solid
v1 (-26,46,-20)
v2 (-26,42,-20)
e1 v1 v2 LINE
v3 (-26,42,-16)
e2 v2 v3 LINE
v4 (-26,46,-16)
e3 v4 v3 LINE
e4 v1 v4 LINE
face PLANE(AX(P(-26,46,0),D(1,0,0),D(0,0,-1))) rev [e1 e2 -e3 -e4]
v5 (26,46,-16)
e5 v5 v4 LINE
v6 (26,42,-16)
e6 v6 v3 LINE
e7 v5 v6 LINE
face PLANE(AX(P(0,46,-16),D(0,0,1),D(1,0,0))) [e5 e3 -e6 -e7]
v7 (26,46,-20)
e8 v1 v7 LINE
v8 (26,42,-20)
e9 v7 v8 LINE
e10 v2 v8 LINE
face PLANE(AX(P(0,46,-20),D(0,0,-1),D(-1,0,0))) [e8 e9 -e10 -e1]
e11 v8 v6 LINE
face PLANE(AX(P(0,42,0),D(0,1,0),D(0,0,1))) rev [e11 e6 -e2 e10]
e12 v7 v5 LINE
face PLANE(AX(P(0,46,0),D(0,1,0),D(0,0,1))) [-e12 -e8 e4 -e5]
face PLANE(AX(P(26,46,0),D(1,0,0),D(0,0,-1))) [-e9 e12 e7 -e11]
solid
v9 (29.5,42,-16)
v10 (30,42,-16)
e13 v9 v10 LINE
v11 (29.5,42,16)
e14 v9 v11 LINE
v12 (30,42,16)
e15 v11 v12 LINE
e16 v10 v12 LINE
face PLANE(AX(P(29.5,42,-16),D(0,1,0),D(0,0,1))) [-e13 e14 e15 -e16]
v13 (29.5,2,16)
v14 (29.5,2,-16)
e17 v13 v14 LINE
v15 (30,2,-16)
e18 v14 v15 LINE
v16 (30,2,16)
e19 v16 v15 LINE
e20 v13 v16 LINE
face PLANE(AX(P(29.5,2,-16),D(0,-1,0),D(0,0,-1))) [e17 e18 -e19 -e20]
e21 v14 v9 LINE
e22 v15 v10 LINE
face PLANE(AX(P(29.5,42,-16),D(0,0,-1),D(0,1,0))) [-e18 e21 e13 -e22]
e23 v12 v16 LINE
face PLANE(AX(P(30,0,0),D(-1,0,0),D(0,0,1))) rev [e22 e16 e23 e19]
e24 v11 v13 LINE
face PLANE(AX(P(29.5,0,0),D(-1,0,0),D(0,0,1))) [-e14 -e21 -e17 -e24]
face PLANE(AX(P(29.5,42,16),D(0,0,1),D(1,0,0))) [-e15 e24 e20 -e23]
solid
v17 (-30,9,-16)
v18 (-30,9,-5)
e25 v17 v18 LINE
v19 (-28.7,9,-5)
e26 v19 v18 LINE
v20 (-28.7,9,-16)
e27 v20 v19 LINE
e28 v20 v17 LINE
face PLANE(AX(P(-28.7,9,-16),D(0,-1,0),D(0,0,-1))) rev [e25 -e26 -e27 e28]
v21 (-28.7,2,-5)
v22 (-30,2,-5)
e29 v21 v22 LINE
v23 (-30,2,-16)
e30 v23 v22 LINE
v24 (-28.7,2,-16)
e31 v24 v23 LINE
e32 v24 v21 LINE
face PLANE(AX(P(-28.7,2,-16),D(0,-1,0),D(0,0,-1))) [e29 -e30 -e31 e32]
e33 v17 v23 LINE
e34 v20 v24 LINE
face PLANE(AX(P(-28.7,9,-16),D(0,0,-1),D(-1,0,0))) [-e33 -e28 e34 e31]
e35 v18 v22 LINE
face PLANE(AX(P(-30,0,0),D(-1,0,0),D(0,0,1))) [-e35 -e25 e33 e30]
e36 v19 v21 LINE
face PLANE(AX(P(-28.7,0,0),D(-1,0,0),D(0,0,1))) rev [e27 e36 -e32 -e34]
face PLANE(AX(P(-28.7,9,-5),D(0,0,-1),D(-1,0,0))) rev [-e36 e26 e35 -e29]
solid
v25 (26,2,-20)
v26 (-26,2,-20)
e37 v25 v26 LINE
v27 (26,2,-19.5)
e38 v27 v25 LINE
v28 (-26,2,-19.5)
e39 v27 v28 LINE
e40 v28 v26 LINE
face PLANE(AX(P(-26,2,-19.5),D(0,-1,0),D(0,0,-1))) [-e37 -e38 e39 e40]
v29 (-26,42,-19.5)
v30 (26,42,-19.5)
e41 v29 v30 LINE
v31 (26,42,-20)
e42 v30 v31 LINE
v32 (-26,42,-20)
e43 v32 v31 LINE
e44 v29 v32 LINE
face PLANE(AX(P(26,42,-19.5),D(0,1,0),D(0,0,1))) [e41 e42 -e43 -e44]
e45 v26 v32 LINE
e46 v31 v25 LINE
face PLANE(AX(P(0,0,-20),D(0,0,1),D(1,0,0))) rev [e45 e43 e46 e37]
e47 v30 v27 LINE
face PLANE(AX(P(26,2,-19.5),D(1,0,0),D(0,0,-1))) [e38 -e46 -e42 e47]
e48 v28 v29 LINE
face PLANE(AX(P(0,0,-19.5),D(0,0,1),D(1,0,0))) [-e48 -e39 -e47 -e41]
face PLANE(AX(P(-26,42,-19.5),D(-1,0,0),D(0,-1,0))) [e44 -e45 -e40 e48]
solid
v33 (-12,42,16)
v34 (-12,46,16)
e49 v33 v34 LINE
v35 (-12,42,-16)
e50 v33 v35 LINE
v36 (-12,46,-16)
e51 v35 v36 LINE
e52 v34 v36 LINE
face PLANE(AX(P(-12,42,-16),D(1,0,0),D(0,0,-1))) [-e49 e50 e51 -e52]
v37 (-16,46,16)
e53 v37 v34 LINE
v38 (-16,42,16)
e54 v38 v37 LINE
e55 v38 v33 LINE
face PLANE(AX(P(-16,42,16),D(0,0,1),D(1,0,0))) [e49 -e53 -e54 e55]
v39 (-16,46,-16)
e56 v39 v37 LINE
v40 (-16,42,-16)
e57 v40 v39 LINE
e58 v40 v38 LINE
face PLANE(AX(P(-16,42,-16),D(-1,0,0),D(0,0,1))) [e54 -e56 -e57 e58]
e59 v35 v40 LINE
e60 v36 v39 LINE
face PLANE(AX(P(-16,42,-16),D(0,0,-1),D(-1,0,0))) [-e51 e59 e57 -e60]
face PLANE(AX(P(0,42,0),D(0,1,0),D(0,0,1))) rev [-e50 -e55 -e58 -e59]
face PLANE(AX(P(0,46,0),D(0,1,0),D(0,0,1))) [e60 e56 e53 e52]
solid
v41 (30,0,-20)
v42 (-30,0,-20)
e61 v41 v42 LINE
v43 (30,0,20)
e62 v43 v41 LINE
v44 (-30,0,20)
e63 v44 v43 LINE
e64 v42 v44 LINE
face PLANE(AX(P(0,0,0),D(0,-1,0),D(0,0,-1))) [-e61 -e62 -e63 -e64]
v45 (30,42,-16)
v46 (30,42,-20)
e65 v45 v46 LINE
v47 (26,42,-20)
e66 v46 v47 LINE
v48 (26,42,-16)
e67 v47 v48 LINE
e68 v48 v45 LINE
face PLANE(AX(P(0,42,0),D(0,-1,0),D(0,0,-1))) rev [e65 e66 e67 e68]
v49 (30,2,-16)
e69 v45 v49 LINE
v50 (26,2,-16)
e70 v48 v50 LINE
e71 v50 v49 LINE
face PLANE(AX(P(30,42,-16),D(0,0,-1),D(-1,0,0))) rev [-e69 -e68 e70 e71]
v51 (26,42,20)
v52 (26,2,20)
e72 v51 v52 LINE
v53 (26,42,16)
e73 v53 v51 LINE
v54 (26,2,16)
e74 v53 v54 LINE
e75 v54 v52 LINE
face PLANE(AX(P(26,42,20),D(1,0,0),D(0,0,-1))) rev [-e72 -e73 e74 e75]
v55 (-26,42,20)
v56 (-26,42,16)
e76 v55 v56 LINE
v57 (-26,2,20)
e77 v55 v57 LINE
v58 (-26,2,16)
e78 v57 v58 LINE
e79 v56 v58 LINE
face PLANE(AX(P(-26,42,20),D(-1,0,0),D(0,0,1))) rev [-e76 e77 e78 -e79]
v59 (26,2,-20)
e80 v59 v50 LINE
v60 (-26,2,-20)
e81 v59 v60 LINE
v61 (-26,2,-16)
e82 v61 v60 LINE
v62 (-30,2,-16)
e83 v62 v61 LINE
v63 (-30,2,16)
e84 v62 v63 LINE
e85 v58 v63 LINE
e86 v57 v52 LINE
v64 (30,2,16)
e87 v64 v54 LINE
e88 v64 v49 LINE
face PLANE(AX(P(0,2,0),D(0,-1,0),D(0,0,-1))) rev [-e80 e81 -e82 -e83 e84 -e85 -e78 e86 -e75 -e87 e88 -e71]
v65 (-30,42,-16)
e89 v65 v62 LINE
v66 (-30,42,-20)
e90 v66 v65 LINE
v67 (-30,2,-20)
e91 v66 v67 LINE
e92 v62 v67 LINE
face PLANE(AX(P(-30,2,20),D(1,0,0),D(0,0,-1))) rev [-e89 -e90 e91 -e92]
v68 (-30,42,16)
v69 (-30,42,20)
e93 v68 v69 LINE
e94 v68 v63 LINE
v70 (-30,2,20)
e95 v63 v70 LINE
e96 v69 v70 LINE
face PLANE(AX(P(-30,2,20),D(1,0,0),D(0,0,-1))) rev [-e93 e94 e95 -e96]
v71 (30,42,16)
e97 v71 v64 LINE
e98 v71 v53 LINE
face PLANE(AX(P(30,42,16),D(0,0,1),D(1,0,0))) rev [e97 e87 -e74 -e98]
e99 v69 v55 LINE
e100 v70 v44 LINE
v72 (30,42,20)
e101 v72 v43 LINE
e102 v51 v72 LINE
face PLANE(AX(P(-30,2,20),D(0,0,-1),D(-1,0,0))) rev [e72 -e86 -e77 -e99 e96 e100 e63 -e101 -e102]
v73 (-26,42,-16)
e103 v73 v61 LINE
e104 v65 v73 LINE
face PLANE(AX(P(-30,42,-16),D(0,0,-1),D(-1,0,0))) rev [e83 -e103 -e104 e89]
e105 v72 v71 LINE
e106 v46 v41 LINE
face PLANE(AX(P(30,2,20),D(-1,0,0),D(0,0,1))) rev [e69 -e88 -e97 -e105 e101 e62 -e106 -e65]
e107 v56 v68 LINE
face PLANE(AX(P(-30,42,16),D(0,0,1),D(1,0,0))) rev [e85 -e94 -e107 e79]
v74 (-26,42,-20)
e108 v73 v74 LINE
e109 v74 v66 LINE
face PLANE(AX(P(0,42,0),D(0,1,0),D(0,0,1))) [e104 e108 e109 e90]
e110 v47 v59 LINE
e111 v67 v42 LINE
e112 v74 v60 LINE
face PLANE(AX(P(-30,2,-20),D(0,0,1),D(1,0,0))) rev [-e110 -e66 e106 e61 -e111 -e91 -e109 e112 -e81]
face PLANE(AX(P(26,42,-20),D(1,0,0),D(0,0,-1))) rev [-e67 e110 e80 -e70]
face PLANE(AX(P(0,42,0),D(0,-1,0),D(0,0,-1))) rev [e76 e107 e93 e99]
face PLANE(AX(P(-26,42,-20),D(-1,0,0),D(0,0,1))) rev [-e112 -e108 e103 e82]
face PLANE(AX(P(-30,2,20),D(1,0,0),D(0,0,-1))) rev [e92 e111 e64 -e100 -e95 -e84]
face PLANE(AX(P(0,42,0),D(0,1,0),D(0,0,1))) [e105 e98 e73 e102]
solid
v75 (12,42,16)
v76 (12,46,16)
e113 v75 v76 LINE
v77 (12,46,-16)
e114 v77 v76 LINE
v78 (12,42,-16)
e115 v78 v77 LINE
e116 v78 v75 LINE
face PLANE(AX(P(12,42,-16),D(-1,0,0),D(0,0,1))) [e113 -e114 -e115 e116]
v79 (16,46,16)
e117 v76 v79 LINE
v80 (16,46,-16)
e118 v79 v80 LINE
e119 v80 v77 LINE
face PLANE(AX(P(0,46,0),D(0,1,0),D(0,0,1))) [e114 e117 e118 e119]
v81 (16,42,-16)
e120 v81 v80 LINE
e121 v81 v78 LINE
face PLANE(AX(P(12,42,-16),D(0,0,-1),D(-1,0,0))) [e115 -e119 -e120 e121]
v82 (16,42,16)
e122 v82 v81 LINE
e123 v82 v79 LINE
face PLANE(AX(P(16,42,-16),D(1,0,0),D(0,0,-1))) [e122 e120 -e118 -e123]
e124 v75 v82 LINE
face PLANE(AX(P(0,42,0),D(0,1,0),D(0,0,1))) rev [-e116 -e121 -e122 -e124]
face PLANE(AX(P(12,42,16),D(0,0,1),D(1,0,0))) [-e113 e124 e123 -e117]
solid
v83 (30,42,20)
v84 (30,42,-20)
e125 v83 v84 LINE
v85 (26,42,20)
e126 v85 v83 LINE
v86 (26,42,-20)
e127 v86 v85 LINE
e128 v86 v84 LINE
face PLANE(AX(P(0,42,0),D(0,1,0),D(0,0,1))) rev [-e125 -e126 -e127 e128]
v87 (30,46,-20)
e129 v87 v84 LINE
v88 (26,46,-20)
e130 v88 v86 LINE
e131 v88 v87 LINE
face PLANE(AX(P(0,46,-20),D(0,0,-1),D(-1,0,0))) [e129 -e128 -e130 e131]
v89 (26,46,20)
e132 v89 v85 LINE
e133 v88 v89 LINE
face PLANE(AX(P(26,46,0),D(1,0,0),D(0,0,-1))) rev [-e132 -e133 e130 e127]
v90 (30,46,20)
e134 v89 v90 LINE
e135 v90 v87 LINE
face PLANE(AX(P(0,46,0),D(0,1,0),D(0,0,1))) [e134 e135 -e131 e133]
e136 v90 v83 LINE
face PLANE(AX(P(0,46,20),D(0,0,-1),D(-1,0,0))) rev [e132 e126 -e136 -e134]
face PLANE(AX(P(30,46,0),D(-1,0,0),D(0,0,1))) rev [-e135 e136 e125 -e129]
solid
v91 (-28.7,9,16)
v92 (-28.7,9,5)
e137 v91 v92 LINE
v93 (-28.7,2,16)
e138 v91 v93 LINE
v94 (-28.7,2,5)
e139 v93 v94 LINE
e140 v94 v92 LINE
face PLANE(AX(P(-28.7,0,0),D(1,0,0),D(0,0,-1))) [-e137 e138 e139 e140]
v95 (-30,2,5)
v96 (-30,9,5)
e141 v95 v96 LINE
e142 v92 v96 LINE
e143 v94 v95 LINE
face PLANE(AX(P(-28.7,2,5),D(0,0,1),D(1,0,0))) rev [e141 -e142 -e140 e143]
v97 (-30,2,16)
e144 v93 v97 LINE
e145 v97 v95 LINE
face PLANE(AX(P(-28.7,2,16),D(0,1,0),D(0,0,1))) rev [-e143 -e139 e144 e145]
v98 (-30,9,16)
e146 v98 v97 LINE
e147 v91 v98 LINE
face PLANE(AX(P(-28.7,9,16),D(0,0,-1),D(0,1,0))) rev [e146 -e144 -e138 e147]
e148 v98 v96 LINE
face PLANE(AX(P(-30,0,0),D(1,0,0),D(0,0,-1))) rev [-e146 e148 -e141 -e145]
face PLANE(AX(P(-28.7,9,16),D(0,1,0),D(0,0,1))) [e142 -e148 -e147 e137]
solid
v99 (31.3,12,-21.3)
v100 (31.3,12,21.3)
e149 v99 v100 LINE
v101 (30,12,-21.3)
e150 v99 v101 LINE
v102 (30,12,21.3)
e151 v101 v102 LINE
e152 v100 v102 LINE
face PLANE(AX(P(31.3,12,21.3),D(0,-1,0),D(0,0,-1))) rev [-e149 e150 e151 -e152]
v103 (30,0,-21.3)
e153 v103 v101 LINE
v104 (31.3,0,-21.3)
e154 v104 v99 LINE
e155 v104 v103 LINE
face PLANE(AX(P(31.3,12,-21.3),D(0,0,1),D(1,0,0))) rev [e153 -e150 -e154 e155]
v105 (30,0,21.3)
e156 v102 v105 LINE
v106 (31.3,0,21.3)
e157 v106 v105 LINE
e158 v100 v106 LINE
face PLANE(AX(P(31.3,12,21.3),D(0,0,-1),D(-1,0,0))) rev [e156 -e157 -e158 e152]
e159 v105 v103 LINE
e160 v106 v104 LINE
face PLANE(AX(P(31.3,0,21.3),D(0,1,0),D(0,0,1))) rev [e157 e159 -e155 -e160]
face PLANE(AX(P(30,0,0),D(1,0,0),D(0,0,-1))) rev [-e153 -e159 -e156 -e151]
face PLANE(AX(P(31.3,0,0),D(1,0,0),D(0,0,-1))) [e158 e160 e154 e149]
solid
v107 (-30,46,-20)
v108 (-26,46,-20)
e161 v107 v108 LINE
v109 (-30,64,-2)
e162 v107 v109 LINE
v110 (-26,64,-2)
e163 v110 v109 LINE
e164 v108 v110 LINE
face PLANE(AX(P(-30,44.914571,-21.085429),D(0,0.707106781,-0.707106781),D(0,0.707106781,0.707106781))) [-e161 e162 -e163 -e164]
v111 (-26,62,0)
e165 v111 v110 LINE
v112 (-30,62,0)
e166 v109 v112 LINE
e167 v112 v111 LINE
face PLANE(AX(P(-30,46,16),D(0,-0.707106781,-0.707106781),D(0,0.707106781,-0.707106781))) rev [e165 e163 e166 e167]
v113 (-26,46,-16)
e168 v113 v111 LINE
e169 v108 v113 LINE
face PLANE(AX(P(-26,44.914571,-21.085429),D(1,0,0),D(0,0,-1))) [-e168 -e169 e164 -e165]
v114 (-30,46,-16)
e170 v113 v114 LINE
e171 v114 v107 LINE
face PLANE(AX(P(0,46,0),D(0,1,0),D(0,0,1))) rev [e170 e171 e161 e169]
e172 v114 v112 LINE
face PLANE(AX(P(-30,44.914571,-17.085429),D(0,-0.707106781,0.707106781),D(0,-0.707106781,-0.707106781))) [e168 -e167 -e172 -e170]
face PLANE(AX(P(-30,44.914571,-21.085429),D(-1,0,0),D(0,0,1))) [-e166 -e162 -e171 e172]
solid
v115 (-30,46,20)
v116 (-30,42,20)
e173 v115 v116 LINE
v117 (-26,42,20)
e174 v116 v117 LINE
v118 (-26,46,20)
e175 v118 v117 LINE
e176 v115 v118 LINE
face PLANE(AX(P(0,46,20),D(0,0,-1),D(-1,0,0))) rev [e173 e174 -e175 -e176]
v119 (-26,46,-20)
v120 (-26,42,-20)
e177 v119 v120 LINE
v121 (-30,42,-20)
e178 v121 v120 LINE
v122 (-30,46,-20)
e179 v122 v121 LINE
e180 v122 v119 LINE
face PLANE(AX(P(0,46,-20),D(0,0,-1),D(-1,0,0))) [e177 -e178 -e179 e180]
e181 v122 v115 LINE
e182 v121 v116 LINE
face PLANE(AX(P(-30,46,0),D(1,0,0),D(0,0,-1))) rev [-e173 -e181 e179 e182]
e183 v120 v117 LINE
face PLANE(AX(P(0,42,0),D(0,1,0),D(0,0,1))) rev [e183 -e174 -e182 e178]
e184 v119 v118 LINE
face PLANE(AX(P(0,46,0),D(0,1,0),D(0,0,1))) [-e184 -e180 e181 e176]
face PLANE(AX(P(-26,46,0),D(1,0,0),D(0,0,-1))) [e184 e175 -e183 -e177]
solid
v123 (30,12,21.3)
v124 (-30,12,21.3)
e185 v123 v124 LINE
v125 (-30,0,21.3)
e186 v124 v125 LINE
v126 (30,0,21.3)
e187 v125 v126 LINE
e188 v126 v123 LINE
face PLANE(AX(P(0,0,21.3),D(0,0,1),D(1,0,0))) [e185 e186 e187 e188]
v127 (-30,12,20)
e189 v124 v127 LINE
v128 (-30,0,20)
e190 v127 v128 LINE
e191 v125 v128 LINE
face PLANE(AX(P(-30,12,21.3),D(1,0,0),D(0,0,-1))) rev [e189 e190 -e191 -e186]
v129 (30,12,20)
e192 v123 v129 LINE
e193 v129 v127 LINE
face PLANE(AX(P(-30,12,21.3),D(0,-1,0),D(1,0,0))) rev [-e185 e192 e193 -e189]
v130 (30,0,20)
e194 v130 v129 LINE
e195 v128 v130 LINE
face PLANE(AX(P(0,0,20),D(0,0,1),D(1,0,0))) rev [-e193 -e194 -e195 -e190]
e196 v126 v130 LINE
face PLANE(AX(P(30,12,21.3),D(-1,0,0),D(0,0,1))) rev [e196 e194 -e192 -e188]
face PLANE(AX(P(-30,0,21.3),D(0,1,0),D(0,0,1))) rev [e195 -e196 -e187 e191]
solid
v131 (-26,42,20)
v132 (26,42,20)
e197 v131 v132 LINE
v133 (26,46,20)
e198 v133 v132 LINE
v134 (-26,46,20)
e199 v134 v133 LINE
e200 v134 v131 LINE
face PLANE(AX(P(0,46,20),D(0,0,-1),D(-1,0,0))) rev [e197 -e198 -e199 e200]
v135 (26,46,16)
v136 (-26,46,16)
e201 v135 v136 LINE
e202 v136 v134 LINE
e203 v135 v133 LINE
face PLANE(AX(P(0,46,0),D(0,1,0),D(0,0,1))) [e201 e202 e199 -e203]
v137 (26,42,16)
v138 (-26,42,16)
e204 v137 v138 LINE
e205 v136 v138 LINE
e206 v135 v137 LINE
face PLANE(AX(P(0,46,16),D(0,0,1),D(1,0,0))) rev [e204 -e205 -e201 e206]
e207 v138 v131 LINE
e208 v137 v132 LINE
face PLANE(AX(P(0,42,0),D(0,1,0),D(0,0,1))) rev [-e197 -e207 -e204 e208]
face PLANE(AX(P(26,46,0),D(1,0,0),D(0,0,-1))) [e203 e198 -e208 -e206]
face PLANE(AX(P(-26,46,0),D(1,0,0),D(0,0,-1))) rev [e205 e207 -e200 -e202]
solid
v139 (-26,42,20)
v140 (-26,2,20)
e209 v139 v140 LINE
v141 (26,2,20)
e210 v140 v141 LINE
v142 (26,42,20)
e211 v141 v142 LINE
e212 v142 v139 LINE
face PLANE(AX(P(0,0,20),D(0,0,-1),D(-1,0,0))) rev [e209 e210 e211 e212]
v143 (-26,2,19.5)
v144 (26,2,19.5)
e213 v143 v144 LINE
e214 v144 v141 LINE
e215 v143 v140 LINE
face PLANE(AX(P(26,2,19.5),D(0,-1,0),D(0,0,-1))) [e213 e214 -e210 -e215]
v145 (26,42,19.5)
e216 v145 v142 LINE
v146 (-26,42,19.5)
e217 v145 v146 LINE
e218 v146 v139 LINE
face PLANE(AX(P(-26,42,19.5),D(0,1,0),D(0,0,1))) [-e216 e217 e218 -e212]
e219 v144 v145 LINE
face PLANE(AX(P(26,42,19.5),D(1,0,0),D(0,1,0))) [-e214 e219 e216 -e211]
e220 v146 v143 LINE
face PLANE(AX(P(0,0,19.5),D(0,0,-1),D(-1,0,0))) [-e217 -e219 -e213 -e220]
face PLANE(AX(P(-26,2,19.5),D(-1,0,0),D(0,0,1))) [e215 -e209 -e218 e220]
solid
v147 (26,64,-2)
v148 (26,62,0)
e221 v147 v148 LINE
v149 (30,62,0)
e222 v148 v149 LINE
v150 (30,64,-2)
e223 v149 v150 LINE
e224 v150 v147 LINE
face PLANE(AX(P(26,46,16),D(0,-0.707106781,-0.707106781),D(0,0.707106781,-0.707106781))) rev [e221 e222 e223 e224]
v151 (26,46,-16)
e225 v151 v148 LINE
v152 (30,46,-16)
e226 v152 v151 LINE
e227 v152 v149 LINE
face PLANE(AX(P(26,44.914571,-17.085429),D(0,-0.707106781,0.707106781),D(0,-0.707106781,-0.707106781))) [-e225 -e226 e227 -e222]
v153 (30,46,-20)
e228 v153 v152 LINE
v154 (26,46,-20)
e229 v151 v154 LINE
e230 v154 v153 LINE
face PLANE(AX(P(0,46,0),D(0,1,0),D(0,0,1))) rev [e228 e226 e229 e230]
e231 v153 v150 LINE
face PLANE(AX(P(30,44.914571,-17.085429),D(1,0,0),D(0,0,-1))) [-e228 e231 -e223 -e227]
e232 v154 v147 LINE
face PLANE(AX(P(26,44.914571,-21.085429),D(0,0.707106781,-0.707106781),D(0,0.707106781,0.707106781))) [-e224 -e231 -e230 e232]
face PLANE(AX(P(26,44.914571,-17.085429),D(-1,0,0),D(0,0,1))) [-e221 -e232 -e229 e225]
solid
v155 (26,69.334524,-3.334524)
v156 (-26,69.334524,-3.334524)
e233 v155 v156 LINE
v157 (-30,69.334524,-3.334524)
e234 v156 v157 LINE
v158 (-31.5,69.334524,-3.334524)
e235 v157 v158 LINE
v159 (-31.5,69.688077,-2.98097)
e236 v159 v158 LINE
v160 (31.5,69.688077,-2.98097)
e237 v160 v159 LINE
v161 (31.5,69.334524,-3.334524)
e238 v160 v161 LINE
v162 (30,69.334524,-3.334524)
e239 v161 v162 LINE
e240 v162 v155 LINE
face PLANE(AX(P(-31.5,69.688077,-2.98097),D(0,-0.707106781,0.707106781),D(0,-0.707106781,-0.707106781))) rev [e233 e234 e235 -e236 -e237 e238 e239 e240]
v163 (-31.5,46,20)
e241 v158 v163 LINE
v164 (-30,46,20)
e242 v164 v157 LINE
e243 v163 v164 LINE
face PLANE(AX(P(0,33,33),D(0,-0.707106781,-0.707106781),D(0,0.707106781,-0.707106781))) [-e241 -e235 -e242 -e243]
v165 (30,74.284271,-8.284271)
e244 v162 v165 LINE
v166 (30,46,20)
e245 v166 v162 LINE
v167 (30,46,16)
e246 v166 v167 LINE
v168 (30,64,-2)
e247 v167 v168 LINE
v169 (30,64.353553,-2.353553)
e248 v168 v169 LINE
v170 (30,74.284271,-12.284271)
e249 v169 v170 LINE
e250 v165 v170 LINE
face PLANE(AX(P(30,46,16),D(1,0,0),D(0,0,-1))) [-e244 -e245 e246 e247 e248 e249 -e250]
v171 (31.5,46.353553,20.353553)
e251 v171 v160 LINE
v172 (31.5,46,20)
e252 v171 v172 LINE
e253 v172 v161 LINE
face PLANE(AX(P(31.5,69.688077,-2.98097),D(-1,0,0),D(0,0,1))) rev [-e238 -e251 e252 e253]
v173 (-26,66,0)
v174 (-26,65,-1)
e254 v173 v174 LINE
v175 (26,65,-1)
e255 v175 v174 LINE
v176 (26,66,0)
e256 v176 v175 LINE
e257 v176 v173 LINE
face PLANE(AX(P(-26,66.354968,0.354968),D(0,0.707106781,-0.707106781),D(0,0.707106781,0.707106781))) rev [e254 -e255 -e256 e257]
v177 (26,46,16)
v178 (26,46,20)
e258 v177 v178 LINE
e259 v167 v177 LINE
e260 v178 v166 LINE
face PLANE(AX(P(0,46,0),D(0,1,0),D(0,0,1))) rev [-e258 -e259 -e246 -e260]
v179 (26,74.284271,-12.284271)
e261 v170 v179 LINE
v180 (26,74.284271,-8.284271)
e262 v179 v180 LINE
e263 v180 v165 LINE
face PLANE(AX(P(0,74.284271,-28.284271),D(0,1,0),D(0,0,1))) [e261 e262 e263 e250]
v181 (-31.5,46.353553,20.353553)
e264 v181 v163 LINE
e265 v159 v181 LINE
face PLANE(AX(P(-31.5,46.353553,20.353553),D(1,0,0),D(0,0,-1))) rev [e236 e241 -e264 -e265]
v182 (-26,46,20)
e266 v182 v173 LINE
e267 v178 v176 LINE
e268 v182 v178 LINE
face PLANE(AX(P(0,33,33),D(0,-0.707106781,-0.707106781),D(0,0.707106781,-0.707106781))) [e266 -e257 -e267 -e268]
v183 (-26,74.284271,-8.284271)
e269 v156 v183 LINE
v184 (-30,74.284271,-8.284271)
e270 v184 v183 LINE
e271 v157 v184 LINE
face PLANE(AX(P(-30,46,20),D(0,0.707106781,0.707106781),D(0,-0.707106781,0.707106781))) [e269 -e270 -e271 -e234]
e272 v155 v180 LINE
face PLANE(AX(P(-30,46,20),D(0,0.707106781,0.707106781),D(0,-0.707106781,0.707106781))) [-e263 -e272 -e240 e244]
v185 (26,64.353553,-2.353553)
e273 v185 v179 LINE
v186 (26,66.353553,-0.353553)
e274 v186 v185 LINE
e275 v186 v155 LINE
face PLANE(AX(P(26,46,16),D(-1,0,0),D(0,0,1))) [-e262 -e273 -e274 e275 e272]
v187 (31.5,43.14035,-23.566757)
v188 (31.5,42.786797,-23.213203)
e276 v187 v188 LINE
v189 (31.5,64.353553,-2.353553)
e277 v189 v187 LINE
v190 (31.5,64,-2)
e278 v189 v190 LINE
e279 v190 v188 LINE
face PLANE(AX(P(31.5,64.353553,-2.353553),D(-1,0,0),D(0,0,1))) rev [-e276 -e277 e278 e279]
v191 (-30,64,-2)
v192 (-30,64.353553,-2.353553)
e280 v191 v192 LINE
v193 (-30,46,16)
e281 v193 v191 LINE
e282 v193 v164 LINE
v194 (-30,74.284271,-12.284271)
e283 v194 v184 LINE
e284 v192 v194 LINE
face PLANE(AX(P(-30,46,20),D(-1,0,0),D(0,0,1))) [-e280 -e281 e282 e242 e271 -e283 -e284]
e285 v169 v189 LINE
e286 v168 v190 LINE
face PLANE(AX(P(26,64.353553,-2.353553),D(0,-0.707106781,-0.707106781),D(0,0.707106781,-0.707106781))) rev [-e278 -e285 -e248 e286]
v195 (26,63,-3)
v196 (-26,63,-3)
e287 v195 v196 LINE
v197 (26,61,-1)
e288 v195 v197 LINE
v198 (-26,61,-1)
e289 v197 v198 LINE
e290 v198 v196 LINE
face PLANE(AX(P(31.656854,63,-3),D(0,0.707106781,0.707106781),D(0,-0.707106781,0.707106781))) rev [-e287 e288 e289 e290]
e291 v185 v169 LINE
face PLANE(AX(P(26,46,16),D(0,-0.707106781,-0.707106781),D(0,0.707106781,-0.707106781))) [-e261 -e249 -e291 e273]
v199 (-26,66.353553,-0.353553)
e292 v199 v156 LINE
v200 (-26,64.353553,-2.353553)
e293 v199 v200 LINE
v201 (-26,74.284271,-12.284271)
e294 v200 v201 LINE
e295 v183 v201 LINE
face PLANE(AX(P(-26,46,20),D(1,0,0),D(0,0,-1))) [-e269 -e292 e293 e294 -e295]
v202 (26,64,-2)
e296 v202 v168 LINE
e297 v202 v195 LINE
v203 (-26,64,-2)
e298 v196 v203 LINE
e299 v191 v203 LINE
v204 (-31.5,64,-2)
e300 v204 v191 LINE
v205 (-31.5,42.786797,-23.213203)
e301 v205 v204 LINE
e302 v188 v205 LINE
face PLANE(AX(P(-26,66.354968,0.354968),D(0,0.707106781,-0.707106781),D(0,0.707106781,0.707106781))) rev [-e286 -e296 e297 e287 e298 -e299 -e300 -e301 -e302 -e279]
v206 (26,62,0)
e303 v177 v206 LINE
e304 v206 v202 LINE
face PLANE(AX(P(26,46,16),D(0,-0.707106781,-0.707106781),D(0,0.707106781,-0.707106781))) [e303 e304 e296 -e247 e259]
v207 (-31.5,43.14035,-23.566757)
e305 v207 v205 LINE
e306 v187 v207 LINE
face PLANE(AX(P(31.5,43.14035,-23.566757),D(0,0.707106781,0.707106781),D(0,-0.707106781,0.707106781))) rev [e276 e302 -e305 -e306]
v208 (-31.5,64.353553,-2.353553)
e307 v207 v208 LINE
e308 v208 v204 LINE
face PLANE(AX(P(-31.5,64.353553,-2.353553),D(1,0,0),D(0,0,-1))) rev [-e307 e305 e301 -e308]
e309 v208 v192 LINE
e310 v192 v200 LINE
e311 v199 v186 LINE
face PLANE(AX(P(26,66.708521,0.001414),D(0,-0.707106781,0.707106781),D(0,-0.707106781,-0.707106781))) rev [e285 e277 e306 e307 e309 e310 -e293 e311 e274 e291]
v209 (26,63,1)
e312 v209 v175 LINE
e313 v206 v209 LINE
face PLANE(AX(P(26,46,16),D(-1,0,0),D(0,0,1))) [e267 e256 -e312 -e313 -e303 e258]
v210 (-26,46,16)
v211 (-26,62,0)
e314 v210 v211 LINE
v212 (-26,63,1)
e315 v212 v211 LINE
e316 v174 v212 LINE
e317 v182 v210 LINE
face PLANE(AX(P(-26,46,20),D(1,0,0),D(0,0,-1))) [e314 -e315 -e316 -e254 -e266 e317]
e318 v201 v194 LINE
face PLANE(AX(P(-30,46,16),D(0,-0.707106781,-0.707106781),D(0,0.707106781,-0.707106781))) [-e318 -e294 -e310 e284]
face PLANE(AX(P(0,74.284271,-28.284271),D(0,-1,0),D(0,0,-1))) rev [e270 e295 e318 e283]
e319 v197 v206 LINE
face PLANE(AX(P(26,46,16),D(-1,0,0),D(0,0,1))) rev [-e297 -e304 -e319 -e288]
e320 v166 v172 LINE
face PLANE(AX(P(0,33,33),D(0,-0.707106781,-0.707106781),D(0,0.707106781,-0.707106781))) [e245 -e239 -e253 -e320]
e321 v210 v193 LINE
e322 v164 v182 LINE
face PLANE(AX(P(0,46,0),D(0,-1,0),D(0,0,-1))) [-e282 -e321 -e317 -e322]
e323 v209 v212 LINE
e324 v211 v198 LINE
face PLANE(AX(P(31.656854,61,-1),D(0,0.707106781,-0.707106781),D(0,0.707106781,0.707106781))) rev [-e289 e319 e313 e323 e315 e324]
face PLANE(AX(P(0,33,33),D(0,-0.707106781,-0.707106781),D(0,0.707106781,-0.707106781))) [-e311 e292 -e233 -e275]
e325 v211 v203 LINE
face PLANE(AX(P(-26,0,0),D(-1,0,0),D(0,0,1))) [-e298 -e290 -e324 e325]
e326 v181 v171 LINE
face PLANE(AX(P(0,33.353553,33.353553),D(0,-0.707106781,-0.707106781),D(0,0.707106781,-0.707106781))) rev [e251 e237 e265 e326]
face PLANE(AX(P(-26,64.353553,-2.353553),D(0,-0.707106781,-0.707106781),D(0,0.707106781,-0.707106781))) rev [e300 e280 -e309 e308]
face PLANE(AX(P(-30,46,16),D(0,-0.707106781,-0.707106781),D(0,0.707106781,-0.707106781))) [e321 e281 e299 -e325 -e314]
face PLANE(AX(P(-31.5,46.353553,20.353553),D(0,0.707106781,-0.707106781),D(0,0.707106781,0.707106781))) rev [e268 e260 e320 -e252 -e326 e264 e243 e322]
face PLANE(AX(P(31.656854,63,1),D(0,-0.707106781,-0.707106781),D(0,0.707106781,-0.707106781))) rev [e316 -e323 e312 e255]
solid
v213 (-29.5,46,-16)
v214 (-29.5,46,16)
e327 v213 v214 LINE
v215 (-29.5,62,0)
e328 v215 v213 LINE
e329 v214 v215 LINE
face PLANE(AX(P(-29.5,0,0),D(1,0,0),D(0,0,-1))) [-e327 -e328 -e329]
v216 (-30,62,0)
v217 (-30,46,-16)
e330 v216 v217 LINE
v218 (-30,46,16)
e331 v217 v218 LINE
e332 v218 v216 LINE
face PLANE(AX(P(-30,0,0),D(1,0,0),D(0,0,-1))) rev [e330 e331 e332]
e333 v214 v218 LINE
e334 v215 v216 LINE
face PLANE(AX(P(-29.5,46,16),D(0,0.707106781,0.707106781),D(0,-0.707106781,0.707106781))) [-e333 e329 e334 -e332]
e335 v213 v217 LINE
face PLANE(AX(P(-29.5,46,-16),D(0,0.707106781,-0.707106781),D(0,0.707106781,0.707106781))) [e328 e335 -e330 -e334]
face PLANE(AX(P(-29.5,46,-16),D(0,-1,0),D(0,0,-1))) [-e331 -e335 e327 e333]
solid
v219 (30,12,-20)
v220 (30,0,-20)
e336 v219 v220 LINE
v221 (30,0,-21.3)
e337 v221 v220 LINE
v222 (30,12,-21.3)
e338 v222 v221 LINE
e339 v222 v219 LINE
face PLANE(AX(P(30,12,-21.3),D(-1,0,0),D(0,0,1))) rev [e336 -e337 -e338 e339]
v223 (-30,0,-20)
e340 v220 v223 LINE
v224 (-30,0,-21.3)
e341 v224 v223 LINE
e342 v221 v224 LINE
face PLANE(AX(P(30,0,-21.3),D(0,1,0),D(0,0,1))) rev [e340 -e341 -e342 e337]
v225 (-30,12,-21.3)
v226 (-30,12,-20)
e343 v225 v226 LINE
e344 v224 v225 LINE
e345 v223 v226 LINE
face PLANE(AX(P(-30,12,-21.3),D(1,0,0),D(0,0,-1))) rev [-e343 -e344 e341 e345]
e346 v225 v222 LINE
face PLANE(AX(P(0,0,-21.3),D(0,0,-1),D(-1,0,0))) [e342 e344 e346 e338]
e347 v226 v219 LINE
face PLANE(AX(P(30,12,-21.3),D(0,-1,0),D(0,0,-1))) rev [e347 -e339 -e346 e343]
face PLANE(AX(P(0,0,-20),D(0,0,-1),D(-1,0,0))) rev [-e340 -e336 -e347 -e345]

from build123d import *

# Parameters (mm, degrees)
SKETCH1_W              = 60
SKETCH1_H              = 40
BOSS_EXTRUDE1_DEPTH    = 2
SKETCH2_W              = 4
SKETCH2_H              = 4
BOSS_EXTRUDE2_DEPTH    = 40
SKETCH5_W              = 60
SKETCH5_H              = 12
BOSS_EXTRUDE4_DEPTH    = 1.3
SKETCH4_W              = 11
SKETCH4_H              = 7
BOSS_EXTRUDE5_DEPTH    = 1.3
BOSS_EXTRUDE5_2_DEPTH  = 1.3
SKETCH8_W              = 4
SKETCH8_H              = 40
BOSS_EXTRUDE8_DEPTH    = 4
BOSS_EXTRUDE8_2_DEPTH  = 4
SKETCH8_4_W            = 52
SKETCH8_4_H            = 4
BOSS_EXTRUDE9_DEPTH    = 4
BOSS_EXTRUDE9_2_DEPTH  = 4
SKETCH9_W              = 60
SKETCH9_H              = 12
BOSS_EXTRUDE10_DEPTH   = 1.3
SKETCH10_W             = 42.6
SKETCH10_H             = 12
BOSS_EXTRUDE11_DEPTH   = 1.3
SKETCH11_W             = 4
SKETCH11_H             = 32
BOSS_EXTRUDE12_DEPTH   = 4
BOSS_EXTRUDE12_2_DEPTH = 4
SKETCH13_W             = 4
SKETCH13_H             = 4
SWEEP3_START           = -30
SWEEP3_DEPTH           = 4
SKETCH17_W             = 4
SKETCH17_H             = 4
SWEEP5_START           = 26
SWEEP5_DEPTH           = 4
BOSS_EXTRUDE13_DEPTH   = 52
BOSS_EXTRUDE15_DEPTH   = 0.5
SKETCH23_W             = 63
SKETCH23_H             = 33
BOSS_EXTRUDE16_DEPTH   = 0.5
SKETCH24_W             = 52
SKETCH24_H             = 0.5
BOSS_EXTRUDE17_DEPTH   = 1.914214
BOSS_EXTRUDE19_DEPTH   = 0.5
SKETCH29_W             = 52
SKETCH29_H             = 40
BOSS_EXTRUDE21_DEPTH   = 0.5
SKETCH30_W             = 52
SKETCH30_H             = 40
BOSS_EXTRUDE22_DEPTH   = 0.5
SKETCH28_W             = 32
SKETCH28_H             = 40
BOSS_EXTRUDE25_DEPTH   = 0.5


# Read off the part's stored shape, not the designer's step: Sweep3, Sweep5
with BuildPart() as part:
    # Sketch1 → Boss-Extrude1 (new body)
    with BuildSketch(Plane(origin=(0, 0, 0), x_dir=(1, 0, 0), z_dir=(0, 1, 0))):
        Rectangle(SKETCH1_W, SKETCH1_H)
    extrude(amount=BOSS_EXTRUDE1_DEPTH)

    # Sketch2 → Boss-Extrude2 (add)
    with BuildSketch(Plane(origin=(0, 2, 0), x_dir=(1, 0, 0), z_dir=(0, 1, 0))):
        with Locations((-28, 18)):
            Rectangle(SKETCH2_W, SKETCH2_H)
        with Locations((-28, -18)):
            Rectangle(SKETCH2_W, SKETCH2_H)
        with Locations((28, -18)):
            Rectangle(SKETCH2_W, SKETCH2_H)
        with Locations((28, 18)):
            Rectangle(SKETCH2_W, SKETCH2_H)
    extrude(amount=BOSS_EXTRUDE2_DEPTH)


with BuildPart() as body_2:
    # Sketch5 → Boss-Extrude4 (new body)
    with BuildSketch(Plane.XY.offset(20)):
        with Locations((0, 6)):
            Rectangle(SKETCH5_W, SKETCH5_H)
    extrude(amount=BOSS_EXTRUDE4_DEPTH)


with BuildPart() as body_3:
    # Sketch4 → Boss-Extrude5 (new body)
    with BuildSketch(Plane.ZY.offset(30)):
        with Locations((-10.5, 5.5)):
            Rectangle(SKETCH4_W, SKETCH4_H)
    extrude(amount=-BOSS_EXTRUDE5_DEPTH)


with BuildPart() as body_4:
    # Sketch4 → Boss-Extrude5 2 (new body)
    with BuildSketch(Plane.ZY.offset(30)):
        with Locations((10.5, 5.5)):
            Rectangle(SKETCH4_W, SKETCH4_H)
    extrude(amount=-BOSS_EXTRUDE5_2_DEPTH)


with BuildPart() as body_5:
    # Sketch8 → Boss-Extrude8 (new body)
    with BuildSketch(Plane(origin=(0, 42, 0), x_dir=(1, 0, 0), z_dir=(0, 1, 0))):
        with Locations((-28, 0)):
            Rectangle(SKETCH8_W, SKETCH8_H)
    extrude(amount=BOSS_EXTRUDE8_DEPTH)


with BuildPart() as body_6:
    # Sketch8 → Boss-Extrude8 2 (new body)
    with BuildSketch(Plane(origin=(0, 42, 0), x_dir=(1, 0, 0), z_dir=(0, 1, 0))):
        with Locations((28, 0)):
            Rectangle(SKETCH8_W, SKETCH8_H)
    extrude(amount=BOSS_EXTRUDE8_2_DEPTH)


with BuildPart() as body_7:
    # Sketch8<4> → Boss-Extrude9 (new body)
    with BuildSketch(Plane(origin=(0, 42, 0), x_dir=(1, 0, 0), z_dir=(0, 1, 0))):
        with Locations((0, 18)):
            Rectangle(SKETCH8_4_W, SKETCH8_4_H)
    extrude(amount=BOSS_EXTRUDE9_DEPTH)


with BuildPart() as body_8:
    # Sketch8<4> → Boss-Extrude9 2 (new body)
    with BuildSketch(Plane(origin=(0, 42, 0), x_dir=(1, 0, 0), z_dir=(0, 1, 0))):
        with Locations((0, -18)):
            Rectangle(SKETCH8_4_W, SKETCH8_4_H)
    extrude(amount=BOSS_EXTRUDE9_2_DEPTH)


with BuildPart() as body_9:
    # Sketch9 → Boss-Extrude10 (new body)
    with BuildSketch(Plane(origin=(0, 0, -20), x_dir=(-1, 0, 0), z_dir=(0, 0, -1))):
        with Locations((0, 6)):
            Rectangle(SKETCH9_W, SKETCH9_H)
    extrude(amount=BOSS_EXTRUDE10_DEPTH)


with BuildPart() as body_10:
    # Sketch10 → Boss-Extrude11 (new body)
    with BuildSketch(Plane(origin=(30, 0, 0), x_dir=(0, 0, -1), z_dir=(1, 0, 0))):
        with Locations((0, 6)):
            Rectangle(SKETCH10_W, SKETCH10_H)
    extrude(amount=BOSS_EXTRUDE11_DEPTH)


with BuildPart() as body_11:
    # Sketch11 → Boss-Extrude12 (new body)
    with BuildSketch(Plane(origin=(0, 46, 0), x_dir=(1, 0, 0), z_dir=(0, 1, 0))):
        with Locations((-14, 0)):
            Rectangle(SKETCH11_W, SKETCH11_H)
    extrude(amount=-BOSS_EXTRUDE12_DEPTH)


with BuildPart() as body_12:
    # Sketch11 → Boss-Extrude12 2 (new body)
    with BuildSketch(Plane(origin=(0, 46, 0), x_dir=(1, 0, 0), z_dir=(0, 1, 0))):
        with Locations((14, 0)):
            Rectangle(SKETCH11_W, SKETCH11_H)
    extrude(amount=-BOSS_EXTRUDE12_2_DEPTH)


with BuildPart() as body_13:
    # Sweep2: sweep along a path in Sketch14
    with BuildLine(Plane.ZY.offset(28)) as sweep2_path:
        Line((18, 46), (-10.284271247, 74.284271247))
    # Sketch13 → Sweep2 (sweep)
    with BuildSketch(Plane(origin=(0, 46, 0), x_dir=(1, 0, 0), z_dir=(0, 1, 0))):
        with Locations((-28, -18)):
            Rectangle(SKETCH13_W, SKETCH13_H)
    sweep(path=sweep2_path.line)



with BuildPart() as body_14:
    # Sweep3 outline → Sweep3 (new body)
    with BuildSketch(Plane.YZ.offset(SWEEP3_START)):
        Polygon((64, -2), (62, 0), (46, -16), (46, -20), align=None)
    extrude(amount=SWEEP3_DEPTH)


with BuildPart() as body_15:
    # Sweep4: sweep along a path in Sketch18
    with BuildLine(Plane(origin=(28, 0, 0), x_dir=(0, 0, -1), z_dir=(1, 0, 0))) as sweep4_path:
        Line((-18, 46), (10.284271247, 74.284271247))
    # Sketch17 → Sweep4 (sweep)
    with BuildSketch(Plane(origin=(0, 46, 0), x_dir=(1, 0, 0), z_dir=(0, 1, 0))):
        with Locations((28, -18)):
            Rectangle(SKETCH17_W, SKETCH17_H)
    sweep(path=sweep4_path.line)


with BuildPart() as body_16:
    # Sweep5 outline → Sweep5 (new body)
    with BuildSketch(Plane.YZ.offset(SWEEP5_START)):
        Polygon((46, -16), (46, -20), (64, -2), (62, 0), align=None)
    extrude(amount=SWEEP5_DEPTH)


with BuildPart() as body_17:
    # Sketch21 → Boss-Extrude13 (new body)
    with BuildSketch(Plane(origin=(-26, 0, 0), x_dir=(0, 0, -1), z_dir=(1, 0, 0))):
        Polygon((2.999999991, 63.000000009), (0.999999991, 61.000000009), (-0.999999991, 62.999999991), (1.000000009, 64.999999991), align=None)
    extrude(amount=BOSS_EXTRUDE13_DEPTH)


with BuildPart() as body_18:
    # Sketch22 → Boss-Extrude15 (new body)
    with BuildSketch(Plane(origin=(0, 33, -33), x_dir=(1, 0, 0), z_dir=(0, 0.7071067811865477, -0.7071067811865474))):
        Polygon((26, -43.840620434), (26, -45.254833984), (-26, -45.254833984), (-26, -43.840620434), (-31.5, -43.840620434), (-31.5, -13.840620434), (31.5, -13.840620434), (31.5, -43.840620434), align=None)
    extrude(amount=BOSS_EXTRUDE15_DEPTH)


with BuildPart() as body_19:
    # Sketch23 → Boss-Extrude16 (new body)
    with BuildSketch(Plane(origin=(0, 33, 33), x_dir=(1, 0, 0), z_dir=(0, 0.7071067811865477, 0.7071067811865475))):
        with Locations((0, 34.884776311)):
            Rectangle(SKETCH23_W, SKETCH23_H)
    extrude(amount=BOSS_EXTRUDE16_DEPTH)


with BuildPart() as body_13_1:
    add(body_13.part)

    add(body_15.part)  # Boss-Extrude17 merges body 15

    add(body_17.part)  # Boss-Extrude17 merges body 17

    add(body_18.part)  # Boss-Extrude17 merges body 18

    add(body_19.part)  # Boss-Extrude17 merges body 19
    # Sketch24 → Boss-Extrude17 (add)
    with BuildSketch(Plane(origin=(0, 31.999999991, 31.999999991), x_dir=(1, 0, 0), z_dir=(0, 0.7071067811865474, 0.7071067811865477))):
        with Locations((0, 46.919047558)):
            Rectangle(SKETCH24_W, SKETCH24_H)
    extrude(amount=BOSS_EXTRUDE17_DEPTH)


with BuildPart() as body_16_2:
    # Sketch27 → Boss-Extrude19 (new body)
    with BuildSketch(Plane.ZY.offset(30)):
        Polygon((-16, 46), (16, 46), (0, 62), align=None)
    extrude(amount=-BOSS_EXTRUDE19_DEPTH)


with BuildPart() as body_17_2:
    # Sketch29 → Boss-Extrude21 (new body)
    with BuildSketch(Plane(origin=(0, 0, -20), x_dir=(-1, 0, 0), z_dir=(0, 0, -1))):
        with Locations((0, 22)):
            Rectangle(SKETCH29_W, SKETCH29_H)
    extrude(amount=-BOSS_EXTRUDE21_DEPTH)


with BuildPart() as body_18_2:
    # Sketch30 → Boss-Extrude22 (new body)
    with BuildSketch(Plane.XY.offset(20)):
        with Locations((0, 22)):
            Rectangle(SKETCH30_W, SKETCH30_H)
    extrude(amount=-BOSS_EXTRUDE22_DEPTH)


with BuildPart() as body_19_2:
    # Sketch28 → Boss-Extrude25 (new body)
    with BuildSketch(Plane(origin=(30, 0, 0), x_dir=(0, 0, -1), z_dir=(1, 0, 0))):
        with Locations((0, 22)):
            Rectangle(SKETCH28_W, SKETCH28_H)
    extrude(amount=-BOSS_EXTRUDE25_DEPTH)


solid = Compound([part.part, body_2.part, body_3.part, body_4.part, body_5.part, body_6.part, body_7.part, body_8.part, body_9.part, body_10.part, body_11.part, body_12.part, body_14.part, body_16.part, body_13_1.part, body_16_2.part, body_17_2.part, body_18_2.part, body_19_2.part])
